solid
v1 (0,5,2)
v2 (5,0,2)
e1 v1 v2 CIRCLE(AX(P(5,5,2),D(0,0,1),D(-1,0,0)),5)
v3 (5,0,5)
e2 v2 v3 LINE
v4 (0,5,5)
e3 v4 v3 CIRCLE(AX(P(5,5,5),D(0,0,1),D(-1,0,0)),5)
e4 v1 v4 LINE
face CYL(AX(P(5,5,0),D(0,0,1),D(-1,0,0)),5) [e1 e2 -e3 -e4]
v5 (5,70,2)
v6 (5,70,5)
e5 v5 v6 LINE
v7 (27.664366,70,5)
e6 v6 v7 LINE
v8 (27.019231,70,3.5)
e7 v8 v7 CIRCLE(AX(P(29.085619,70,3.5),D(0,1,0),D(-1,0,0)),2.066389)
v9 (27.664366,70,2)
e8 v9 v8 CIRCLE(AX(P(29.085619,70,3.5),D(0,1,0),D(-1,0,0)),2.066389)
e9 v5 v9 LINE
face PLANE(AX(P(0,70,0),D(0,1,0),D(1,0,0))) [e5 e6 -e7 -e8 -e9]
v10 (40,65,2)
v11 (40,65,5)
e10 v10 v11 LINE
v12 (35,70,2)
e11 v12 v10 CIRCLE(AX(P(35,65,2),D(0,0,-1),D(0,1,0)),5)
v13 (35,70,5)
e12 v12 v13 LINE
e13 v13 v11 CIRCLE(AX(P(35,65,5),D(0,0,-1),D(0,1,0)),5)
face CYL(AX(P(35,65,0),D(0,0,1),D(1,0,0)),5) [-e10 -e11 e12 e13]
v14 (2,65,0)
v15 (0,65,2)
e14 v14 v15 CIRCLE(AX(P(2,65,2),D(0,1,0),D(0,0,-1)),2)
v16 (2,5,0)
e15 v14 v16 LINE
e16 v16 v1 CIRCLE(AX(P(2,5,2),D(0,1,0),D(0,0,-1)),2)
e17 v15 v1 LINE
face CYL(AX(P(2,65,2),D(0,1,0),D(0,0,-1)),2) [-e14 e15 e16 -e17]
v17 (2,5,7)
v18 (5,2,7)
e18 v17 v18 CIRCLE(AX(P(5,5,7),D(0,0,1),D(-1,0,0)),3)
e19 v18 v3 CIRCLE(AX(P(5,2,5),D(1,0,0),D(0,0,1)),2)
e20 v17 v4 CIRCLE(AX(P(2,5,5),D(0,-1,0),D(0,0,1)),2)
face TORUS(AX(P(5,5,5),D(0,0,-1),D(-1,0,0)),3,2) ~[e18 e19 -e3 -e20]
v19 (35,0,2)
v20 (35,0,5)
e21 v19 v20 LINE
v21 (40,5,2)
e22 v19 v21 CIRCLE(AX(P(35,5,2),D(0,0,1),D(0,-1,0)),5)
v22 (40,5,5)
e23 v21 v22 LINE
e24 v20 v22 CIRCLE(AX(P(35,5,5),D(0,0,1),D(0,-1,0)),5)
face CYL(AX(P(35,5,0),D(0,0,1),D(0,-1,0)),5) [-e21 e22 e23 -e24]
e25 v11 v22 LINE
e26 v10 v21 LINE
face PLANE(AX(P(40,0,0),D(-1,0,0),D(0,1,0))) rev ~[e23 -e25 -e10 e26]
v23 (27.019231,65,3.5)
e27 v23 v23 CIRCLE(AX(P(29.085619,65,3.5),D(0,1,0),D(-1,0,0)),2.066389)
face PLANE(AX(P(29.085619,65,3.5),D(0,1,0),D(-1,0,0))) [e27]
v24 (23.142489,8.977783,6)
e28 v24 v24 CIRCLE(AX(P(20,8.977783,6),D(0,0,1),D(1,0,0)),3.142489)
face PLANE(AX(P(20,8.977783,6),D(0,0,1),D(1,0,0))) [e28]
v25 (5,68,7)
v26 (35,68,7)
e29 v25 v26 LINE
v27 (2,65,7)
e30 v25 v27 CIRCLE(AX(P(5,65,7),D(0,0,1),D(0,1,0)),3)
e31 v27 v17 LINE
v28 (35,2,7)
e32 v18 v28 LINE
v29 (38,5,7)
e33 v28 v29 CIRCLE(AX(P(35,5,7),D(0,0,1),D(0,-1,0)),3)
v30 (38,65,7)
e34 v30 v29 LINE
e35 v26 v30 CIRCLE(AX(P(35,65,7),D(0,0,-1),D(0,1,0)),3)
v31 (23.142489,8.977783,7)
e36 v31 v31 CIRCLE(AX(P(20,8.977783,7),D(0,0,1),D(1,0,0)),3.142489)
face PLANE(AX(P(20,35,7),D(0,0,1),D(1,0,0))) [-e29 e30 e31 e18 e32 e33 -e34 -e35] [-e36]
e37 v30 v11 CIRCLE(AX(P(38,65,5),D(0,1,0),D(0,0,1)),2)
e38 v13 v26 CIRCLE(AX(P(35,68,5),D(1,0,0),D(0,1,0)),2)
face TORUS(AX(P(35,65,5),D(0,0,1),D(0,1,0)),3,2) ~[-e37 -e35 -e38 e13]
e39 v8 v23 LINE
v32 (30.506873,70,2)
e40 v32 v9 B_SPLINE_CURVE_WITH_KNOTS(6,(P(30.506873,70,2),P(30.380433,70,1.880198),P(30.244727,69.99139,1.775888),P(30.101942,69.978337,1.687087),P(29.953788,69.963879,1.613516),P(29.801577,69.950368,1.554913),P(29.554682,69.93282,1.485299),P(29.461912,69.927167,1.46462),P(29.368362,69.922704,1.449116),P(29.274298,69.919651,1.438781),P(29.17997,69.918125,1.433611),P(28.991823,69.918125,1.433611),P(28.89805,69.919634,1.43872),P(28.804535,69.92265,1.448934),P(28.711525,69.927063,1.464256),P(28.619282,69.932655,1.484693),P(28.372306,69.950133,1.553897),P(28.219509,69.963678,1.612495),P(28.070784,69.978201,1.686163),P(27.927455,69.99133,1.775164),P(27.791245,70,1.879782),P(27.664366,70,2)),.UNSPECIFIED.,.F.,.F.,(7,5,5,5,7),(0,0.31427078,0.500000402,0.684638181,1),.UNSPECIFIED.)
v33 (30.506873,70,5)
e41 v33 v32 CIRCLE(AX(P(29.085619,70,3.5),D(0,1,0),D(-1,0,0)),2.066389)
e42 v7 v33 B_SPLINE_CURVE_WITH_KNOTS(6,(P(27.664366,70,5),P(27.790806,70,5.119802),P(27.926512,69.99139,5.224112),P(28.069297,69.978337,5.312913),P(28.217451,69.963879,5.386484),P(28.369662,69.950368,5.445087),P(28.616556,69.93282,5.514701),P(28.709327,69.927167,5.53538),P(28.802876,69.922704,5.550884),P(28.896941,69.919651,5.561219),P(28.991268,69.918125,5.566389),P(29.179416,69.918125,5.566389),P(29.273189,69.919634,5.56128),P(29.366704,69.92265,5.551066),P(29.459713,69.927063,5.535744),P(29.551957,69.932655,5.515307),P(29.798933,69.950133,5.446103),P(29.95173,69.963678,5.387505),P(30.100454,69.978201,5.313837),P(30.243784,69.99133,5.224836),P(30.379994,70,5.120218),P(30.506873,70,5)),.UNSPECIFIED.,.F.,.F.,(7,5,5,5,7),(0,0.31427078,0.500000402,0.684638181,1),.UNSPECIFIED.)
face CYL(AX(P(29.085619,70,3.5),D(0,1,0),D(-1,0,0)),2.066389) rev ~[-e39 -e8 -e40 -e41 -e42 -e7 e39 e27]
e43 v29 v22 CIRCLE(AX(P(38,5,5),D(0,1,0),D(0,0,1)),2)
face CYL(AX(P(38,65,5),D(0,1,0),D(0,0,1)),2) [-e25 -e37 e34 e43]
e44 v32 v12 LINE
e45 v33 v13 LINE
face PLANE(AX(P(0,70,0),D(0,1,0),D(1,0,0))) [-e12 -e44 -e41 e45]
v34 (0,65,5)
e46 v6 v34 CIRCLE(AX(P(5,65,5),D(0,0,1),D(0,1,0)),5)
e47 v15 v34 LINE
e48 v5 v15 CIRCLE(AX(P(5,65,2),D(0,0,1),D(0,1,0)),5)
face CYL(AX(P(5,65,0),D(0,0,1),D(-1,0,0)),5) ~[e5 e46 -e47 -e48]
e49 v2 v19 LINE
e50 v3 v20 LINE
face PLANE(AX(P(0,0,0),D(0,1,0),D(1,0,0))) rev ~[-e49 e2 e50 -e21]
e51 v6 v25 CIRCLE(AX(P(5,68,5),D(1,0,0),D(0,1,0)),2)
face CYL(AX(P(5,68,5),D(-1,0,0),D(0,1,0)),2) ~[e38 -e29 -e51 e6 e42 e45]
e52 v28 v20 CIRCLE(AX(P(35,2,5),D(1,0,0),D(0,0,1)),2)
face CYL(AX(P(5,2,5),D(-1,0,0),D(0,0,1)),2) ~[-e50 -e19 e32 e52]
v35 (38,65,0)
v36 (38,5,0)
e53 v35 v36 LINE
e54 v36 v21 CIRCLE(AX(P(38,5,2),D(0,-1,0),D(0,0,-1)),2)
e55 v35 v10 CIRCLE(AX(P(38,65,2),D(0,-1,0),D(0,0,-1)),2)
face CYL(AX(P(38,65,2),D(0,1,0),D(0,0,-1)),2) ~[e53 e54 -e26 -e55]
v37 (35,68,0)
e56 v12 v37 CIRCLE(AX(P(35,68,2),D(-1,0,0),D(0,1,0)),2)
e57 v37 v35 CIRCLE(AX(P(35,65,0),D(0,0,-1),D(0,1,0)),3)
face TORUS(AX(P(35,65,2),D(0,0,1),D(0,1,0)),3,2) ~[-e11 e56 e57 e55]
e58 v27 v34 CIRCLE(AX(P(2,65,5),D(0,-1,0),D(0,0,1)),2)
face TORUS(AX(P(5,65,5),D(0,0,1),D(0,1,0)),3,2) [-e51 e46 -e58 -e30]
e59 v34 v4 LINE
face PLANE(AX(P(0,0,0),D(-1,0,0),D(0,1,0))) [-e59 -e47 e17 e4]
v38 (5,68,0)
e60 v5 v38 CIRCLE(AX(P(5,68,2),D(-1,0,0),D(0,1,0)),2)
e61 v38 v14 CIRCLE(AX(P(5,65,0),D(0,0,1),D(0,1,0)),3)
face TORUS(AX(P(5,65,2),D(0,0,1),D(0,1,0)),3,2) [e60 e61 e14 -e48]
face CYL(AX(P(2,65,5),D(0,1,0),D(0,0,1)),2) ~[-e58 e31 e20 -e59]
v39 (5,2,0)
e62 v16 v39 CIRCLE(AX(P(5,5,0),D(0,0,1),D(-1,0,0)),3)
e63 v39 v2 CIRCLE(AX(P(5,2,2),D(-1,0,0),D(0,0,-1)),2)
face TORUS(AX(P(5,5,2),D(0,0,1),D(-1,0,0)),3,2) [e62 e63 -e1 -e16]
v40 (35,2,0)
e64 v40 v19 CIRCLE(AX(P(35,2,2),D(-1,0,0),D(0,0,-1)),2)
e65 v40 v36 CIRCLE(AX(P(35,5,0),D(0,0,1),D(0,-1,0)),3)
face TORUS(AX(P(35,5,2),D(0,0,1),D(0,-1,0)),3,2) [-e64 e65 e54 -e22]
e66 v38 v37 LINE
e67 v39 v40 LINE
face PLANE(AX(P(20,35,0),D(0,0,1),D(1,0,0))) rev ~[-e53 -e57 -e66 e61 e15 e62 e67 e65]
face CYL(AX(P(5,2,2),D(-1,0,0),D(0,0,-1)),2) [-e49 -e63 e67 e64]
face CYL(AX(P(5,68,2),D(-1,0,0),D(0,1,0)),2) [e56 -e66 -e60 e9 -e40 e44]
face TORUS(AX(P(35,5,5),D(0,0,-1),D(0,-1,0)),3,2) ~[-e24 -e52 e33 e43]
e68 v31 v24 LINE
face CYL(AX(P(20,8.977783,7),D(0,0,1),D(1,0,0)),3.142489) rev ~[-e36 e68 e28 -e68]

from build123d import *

# Parameters (mm, degrees)
F0_W         = 40
F0_H         = 70
F1_DEPTH     = 7
F2_R         = 5
F3_R         = 2.0663885281
F4_DEPTH     = 5
F5_T1_DEPTH  = 60
F5_T3_DEPTH  = 30
F5_T6_ANGLE  = 90
F5_T8_ANGLE  = 90
F5_T10_ANGLE = 90
F5_T12_ANGLE = 90
F5_T14_ANGLE = 90
F5_T16_ANGLE = 90
F5_T18_ANGLE = 90
F5_T20_ANGLE = 90
F6_R         = 3.1424887648
F7_DEPTH     = 1


# Not quite as in the source:
# - a fillet or chamfer that OpenCascade refuses, or shapes differently, is made with other operations: its cross-section is extruded or revolved along the edge and cut away or added


with BuildPart() as f1:
    # F0 (on Top) → F1 (new body)
    with BuildSketch(Plane.XY):
        with Locations((20, 35)):
            Rectangle(F0_W, F0_H)
    extrude(amount=F1_DEPTH)

    # F2
    f2_edges = [f1.edges().sort_by_distance(p)[0] for p in [
        (40, 0, 3.5),
        (40, 70, 3.5),
        (0, 0, 3.5),
        (0, 70, 3.5),
    ]]
    fillet(f2_edges, radius=F2_R)

    # F3 (on face) → F4 (cut)
    with BuildSketch(Plane(origin=(0, 70, 0), x_dir=(-1, 0, 0), z_dir=(0, 1, 0))):
        with Locations((-29.0856193751, 3.5)):
            Circle(F3_R)
    extrude(amount=-F4_DEPTH, mode=Mode.SUBTRACT)

    # F5: fillet of radius 2 on 16 edges, made by hand

    # F5_s2 → F5_t1 (cut)
    with BuildSketch(Plane.XZ.offset(-65)):
        with BuildLine():
            ThreePointArc((2, 7), (0.5857864376, 6.4142135624), (0, 5))
            Line((0, 5), (0, 7))
            Line((0, 7), (2, 7))
        make_face()
        with BuildLine():
            ThreePointArc((2, 0), (0.5857864376, 0.5857864376), (0, 2))
            Line((0, 2), (0, 0))
            Line((0, 0), (2, 0))
        make_face()
        with BuildLine():
            ThreePointArc((38, 0), (39.4142135624, 0.5857864376), (40, 2))
            Line((40, 2), (40, 0))
            Line((40, 0), (38, 0))
        make_face()
        with BuildLine():
            ThreePointArc((38, 7), (39.4142135624, 6.4142135624), (40, 5))
            Line((40, 5), (40, 7))
            Line((40, 7), (38, 7))
        make_face()
    extrude(amount=F5_T1_DEPTH, mode=Mode.SUBTRACT)

    # F5_s4 → F5_t3 (cut)
    with BuildSketch(Plane.YZ.offset(5)):
        with BuildLine():
            ThreePointArc((70, 2), (69.4142135624, 0.5857864376), (68, 0))
            Line((68, 0), (70, 0))
            Line((70, 0), (70, 2))
        make_face()
        with BuildLine():
            ThreePointArc((70, 5), (69.4142135624, 6.4142135624), (68, 7))
            Line((68, 7), (70, 7))
            Line((70, 7), (70, 5))
        make_face()
        with BuildLine():
            ThreePointArc((2, 0), (0.5857864376, 0.5857864376), (0, 2))
            Line((0, 2), (0, 0))
            Line((0, 0), (2, 0))
        make_face()
        with BuildLine():
            ThreePointArc((2, 7), (0.5857864376, 6.4142135624), (0, 5))
            Line((0, 5), (0, 7))
            Line((0, 7), (2, 7))
        make_face()
    extrude(amount=F5_T3_DEPTH, mode=Mode.SUBTRACT)

    # F5_s5 → F5_t6 (revolve, cut)
    with BuildSketch(Plane.YZ.offset(35)):
        with BuildLine():
            ThreePointArc((68, 0), (69.4142135624, 0.5857864376), (70, 2))
            Line((70, 2), (70, 0))
            Line((70, 0), (68, 0))
        make_face()
    revolve(axis=Axis((35, 65, 0), (0, 0, -1)), revolution_arc=F5_T6_ANGLE, mode=Mode.SUBTRACT)

    # F5_s7 → F5_t8 (revolve, cut)
    with BuildSketch(Plane.YZ.offset(5)):
        with BuildLine():
            ThreePointArc((68, 0), (69.4142135624, 0.5857864376), (70, 2))
            Line((70, 2), (70, 0))
            Line((70, 0), (68, 0))
        make_face()
    revolve(axis=Axis((5, 65, 0), (0, 0, 1)), revolution_arc=F5_T8_ANGLE, mode=Mode.SUBTRACT)

    # F5_s9 → F5_t10 (revolve, cut)
    with BuildSketch(Plane.YZ.offset(35)):
        with BuildLine():
            ThreePointArc((2, 0), (0.5857864376, 0.5857864376), (0, 2))
            Line((0, 2), (0, 0))
            Line((0, 0), (2, 0))
        make_face()
    revolve(axis=Axis((35, 5, 0), (0, 0, 1)), revolution_arc=F5_T10_ANGLE, mode=Mode.SUBTRACT)

    # F5_s11 → F5_t12 (revolve, cut)
    with BuildSketch(Plane.XZ.offset(-5)):
        with BuildLine():
            ThreePointArc((2, 0), (0.5857864376, 0.5857864376), (0, 2))
            Line((0, 2), (0, 0))
            Line((0, 0), (2, 0))
        make_face()
    revolve(axis=Axis((5, 5, 0), (0, 0, 1)), revolution_arc=F5_T12_ANGLE, mode=Mode.SUBTRACT)

    # F5_s13 → F5_t14 (revolve, cut)
    with BuildSketch(Plane.YZ.offset(35)):
        with BuildLine():
            ThreePointArc((70, 5), (69.4142135624, 6.4142135624), (68, 7))
            Line((68, 7), (70, 7))
            Line((70, 7), (70, 5))
        make_face()
    revolve(axis=Axis((35, 65, 7), (0, 0, -1)), revolution_arc=F5_T14_ANGLE, mode=Mode.SUBTRACT)

    # F5_s15 → F5_t16 (revolve, cut)
    with BuildSketch(Plane.YZ.offset(5)):
        with BuildLine():
            ThreePointArc((70, 5), (69.4142135624, 6.4142135624), (68, 7))
            Line((68, 7), (70, 7))
            Line((70, 7), (70, 5))
        make_face()
    revolve(axis=Axis((5, 65, 7), (0, 0, 1)), revolution_arc=F5_T16_ANGLE, mode=Mode.SUBTRACT)

    # F5_s17 → F5_t18 (revolve, cut)
    with BuildSketch(Plane.YZ.offset(35)):
        with BuildLine():
            ThreePointArc((2, 7), (0.5857864376, 6.4142135624), (0, 5))
            Line((0, 5), (0, 7))
            Line((0, 7), (2, 7))
        make_face()
    revolve(axis=Axis((35, 5, 7), (0, 0, 1)), revolution_arc=F5_T18_ANGLE, mode=Mode.SUBTRACT)

    # F5_s19 → F5_t20 (revolve, cut)
    with BuildSketch(Plane.XZ.offset(-5)):
        with BuildLine():
            ThreePointArc((2, 7), (0.5857864376, 6.4142135624), (0, 5))
            Line((0, 5), (0, 7))
            Line((0, 7), (2, 7))
        make_face()
    revolve(axis=Axis((5, 5, 7), (0, 0, 1)), revolution_arc=F5_T20_ANGLE, mode=Mode.SUBTRACT)

    # F6 (on face) → F7 (cut)
    with BuildSketch(Plane.XY.offset(7)):
        with Locations((20, 8.9777829126)):
            Circle(F6_R)
    extrude(amount=-F7_DEPTH, mode=Mode.SUBTRACT)


solid = f1.part
